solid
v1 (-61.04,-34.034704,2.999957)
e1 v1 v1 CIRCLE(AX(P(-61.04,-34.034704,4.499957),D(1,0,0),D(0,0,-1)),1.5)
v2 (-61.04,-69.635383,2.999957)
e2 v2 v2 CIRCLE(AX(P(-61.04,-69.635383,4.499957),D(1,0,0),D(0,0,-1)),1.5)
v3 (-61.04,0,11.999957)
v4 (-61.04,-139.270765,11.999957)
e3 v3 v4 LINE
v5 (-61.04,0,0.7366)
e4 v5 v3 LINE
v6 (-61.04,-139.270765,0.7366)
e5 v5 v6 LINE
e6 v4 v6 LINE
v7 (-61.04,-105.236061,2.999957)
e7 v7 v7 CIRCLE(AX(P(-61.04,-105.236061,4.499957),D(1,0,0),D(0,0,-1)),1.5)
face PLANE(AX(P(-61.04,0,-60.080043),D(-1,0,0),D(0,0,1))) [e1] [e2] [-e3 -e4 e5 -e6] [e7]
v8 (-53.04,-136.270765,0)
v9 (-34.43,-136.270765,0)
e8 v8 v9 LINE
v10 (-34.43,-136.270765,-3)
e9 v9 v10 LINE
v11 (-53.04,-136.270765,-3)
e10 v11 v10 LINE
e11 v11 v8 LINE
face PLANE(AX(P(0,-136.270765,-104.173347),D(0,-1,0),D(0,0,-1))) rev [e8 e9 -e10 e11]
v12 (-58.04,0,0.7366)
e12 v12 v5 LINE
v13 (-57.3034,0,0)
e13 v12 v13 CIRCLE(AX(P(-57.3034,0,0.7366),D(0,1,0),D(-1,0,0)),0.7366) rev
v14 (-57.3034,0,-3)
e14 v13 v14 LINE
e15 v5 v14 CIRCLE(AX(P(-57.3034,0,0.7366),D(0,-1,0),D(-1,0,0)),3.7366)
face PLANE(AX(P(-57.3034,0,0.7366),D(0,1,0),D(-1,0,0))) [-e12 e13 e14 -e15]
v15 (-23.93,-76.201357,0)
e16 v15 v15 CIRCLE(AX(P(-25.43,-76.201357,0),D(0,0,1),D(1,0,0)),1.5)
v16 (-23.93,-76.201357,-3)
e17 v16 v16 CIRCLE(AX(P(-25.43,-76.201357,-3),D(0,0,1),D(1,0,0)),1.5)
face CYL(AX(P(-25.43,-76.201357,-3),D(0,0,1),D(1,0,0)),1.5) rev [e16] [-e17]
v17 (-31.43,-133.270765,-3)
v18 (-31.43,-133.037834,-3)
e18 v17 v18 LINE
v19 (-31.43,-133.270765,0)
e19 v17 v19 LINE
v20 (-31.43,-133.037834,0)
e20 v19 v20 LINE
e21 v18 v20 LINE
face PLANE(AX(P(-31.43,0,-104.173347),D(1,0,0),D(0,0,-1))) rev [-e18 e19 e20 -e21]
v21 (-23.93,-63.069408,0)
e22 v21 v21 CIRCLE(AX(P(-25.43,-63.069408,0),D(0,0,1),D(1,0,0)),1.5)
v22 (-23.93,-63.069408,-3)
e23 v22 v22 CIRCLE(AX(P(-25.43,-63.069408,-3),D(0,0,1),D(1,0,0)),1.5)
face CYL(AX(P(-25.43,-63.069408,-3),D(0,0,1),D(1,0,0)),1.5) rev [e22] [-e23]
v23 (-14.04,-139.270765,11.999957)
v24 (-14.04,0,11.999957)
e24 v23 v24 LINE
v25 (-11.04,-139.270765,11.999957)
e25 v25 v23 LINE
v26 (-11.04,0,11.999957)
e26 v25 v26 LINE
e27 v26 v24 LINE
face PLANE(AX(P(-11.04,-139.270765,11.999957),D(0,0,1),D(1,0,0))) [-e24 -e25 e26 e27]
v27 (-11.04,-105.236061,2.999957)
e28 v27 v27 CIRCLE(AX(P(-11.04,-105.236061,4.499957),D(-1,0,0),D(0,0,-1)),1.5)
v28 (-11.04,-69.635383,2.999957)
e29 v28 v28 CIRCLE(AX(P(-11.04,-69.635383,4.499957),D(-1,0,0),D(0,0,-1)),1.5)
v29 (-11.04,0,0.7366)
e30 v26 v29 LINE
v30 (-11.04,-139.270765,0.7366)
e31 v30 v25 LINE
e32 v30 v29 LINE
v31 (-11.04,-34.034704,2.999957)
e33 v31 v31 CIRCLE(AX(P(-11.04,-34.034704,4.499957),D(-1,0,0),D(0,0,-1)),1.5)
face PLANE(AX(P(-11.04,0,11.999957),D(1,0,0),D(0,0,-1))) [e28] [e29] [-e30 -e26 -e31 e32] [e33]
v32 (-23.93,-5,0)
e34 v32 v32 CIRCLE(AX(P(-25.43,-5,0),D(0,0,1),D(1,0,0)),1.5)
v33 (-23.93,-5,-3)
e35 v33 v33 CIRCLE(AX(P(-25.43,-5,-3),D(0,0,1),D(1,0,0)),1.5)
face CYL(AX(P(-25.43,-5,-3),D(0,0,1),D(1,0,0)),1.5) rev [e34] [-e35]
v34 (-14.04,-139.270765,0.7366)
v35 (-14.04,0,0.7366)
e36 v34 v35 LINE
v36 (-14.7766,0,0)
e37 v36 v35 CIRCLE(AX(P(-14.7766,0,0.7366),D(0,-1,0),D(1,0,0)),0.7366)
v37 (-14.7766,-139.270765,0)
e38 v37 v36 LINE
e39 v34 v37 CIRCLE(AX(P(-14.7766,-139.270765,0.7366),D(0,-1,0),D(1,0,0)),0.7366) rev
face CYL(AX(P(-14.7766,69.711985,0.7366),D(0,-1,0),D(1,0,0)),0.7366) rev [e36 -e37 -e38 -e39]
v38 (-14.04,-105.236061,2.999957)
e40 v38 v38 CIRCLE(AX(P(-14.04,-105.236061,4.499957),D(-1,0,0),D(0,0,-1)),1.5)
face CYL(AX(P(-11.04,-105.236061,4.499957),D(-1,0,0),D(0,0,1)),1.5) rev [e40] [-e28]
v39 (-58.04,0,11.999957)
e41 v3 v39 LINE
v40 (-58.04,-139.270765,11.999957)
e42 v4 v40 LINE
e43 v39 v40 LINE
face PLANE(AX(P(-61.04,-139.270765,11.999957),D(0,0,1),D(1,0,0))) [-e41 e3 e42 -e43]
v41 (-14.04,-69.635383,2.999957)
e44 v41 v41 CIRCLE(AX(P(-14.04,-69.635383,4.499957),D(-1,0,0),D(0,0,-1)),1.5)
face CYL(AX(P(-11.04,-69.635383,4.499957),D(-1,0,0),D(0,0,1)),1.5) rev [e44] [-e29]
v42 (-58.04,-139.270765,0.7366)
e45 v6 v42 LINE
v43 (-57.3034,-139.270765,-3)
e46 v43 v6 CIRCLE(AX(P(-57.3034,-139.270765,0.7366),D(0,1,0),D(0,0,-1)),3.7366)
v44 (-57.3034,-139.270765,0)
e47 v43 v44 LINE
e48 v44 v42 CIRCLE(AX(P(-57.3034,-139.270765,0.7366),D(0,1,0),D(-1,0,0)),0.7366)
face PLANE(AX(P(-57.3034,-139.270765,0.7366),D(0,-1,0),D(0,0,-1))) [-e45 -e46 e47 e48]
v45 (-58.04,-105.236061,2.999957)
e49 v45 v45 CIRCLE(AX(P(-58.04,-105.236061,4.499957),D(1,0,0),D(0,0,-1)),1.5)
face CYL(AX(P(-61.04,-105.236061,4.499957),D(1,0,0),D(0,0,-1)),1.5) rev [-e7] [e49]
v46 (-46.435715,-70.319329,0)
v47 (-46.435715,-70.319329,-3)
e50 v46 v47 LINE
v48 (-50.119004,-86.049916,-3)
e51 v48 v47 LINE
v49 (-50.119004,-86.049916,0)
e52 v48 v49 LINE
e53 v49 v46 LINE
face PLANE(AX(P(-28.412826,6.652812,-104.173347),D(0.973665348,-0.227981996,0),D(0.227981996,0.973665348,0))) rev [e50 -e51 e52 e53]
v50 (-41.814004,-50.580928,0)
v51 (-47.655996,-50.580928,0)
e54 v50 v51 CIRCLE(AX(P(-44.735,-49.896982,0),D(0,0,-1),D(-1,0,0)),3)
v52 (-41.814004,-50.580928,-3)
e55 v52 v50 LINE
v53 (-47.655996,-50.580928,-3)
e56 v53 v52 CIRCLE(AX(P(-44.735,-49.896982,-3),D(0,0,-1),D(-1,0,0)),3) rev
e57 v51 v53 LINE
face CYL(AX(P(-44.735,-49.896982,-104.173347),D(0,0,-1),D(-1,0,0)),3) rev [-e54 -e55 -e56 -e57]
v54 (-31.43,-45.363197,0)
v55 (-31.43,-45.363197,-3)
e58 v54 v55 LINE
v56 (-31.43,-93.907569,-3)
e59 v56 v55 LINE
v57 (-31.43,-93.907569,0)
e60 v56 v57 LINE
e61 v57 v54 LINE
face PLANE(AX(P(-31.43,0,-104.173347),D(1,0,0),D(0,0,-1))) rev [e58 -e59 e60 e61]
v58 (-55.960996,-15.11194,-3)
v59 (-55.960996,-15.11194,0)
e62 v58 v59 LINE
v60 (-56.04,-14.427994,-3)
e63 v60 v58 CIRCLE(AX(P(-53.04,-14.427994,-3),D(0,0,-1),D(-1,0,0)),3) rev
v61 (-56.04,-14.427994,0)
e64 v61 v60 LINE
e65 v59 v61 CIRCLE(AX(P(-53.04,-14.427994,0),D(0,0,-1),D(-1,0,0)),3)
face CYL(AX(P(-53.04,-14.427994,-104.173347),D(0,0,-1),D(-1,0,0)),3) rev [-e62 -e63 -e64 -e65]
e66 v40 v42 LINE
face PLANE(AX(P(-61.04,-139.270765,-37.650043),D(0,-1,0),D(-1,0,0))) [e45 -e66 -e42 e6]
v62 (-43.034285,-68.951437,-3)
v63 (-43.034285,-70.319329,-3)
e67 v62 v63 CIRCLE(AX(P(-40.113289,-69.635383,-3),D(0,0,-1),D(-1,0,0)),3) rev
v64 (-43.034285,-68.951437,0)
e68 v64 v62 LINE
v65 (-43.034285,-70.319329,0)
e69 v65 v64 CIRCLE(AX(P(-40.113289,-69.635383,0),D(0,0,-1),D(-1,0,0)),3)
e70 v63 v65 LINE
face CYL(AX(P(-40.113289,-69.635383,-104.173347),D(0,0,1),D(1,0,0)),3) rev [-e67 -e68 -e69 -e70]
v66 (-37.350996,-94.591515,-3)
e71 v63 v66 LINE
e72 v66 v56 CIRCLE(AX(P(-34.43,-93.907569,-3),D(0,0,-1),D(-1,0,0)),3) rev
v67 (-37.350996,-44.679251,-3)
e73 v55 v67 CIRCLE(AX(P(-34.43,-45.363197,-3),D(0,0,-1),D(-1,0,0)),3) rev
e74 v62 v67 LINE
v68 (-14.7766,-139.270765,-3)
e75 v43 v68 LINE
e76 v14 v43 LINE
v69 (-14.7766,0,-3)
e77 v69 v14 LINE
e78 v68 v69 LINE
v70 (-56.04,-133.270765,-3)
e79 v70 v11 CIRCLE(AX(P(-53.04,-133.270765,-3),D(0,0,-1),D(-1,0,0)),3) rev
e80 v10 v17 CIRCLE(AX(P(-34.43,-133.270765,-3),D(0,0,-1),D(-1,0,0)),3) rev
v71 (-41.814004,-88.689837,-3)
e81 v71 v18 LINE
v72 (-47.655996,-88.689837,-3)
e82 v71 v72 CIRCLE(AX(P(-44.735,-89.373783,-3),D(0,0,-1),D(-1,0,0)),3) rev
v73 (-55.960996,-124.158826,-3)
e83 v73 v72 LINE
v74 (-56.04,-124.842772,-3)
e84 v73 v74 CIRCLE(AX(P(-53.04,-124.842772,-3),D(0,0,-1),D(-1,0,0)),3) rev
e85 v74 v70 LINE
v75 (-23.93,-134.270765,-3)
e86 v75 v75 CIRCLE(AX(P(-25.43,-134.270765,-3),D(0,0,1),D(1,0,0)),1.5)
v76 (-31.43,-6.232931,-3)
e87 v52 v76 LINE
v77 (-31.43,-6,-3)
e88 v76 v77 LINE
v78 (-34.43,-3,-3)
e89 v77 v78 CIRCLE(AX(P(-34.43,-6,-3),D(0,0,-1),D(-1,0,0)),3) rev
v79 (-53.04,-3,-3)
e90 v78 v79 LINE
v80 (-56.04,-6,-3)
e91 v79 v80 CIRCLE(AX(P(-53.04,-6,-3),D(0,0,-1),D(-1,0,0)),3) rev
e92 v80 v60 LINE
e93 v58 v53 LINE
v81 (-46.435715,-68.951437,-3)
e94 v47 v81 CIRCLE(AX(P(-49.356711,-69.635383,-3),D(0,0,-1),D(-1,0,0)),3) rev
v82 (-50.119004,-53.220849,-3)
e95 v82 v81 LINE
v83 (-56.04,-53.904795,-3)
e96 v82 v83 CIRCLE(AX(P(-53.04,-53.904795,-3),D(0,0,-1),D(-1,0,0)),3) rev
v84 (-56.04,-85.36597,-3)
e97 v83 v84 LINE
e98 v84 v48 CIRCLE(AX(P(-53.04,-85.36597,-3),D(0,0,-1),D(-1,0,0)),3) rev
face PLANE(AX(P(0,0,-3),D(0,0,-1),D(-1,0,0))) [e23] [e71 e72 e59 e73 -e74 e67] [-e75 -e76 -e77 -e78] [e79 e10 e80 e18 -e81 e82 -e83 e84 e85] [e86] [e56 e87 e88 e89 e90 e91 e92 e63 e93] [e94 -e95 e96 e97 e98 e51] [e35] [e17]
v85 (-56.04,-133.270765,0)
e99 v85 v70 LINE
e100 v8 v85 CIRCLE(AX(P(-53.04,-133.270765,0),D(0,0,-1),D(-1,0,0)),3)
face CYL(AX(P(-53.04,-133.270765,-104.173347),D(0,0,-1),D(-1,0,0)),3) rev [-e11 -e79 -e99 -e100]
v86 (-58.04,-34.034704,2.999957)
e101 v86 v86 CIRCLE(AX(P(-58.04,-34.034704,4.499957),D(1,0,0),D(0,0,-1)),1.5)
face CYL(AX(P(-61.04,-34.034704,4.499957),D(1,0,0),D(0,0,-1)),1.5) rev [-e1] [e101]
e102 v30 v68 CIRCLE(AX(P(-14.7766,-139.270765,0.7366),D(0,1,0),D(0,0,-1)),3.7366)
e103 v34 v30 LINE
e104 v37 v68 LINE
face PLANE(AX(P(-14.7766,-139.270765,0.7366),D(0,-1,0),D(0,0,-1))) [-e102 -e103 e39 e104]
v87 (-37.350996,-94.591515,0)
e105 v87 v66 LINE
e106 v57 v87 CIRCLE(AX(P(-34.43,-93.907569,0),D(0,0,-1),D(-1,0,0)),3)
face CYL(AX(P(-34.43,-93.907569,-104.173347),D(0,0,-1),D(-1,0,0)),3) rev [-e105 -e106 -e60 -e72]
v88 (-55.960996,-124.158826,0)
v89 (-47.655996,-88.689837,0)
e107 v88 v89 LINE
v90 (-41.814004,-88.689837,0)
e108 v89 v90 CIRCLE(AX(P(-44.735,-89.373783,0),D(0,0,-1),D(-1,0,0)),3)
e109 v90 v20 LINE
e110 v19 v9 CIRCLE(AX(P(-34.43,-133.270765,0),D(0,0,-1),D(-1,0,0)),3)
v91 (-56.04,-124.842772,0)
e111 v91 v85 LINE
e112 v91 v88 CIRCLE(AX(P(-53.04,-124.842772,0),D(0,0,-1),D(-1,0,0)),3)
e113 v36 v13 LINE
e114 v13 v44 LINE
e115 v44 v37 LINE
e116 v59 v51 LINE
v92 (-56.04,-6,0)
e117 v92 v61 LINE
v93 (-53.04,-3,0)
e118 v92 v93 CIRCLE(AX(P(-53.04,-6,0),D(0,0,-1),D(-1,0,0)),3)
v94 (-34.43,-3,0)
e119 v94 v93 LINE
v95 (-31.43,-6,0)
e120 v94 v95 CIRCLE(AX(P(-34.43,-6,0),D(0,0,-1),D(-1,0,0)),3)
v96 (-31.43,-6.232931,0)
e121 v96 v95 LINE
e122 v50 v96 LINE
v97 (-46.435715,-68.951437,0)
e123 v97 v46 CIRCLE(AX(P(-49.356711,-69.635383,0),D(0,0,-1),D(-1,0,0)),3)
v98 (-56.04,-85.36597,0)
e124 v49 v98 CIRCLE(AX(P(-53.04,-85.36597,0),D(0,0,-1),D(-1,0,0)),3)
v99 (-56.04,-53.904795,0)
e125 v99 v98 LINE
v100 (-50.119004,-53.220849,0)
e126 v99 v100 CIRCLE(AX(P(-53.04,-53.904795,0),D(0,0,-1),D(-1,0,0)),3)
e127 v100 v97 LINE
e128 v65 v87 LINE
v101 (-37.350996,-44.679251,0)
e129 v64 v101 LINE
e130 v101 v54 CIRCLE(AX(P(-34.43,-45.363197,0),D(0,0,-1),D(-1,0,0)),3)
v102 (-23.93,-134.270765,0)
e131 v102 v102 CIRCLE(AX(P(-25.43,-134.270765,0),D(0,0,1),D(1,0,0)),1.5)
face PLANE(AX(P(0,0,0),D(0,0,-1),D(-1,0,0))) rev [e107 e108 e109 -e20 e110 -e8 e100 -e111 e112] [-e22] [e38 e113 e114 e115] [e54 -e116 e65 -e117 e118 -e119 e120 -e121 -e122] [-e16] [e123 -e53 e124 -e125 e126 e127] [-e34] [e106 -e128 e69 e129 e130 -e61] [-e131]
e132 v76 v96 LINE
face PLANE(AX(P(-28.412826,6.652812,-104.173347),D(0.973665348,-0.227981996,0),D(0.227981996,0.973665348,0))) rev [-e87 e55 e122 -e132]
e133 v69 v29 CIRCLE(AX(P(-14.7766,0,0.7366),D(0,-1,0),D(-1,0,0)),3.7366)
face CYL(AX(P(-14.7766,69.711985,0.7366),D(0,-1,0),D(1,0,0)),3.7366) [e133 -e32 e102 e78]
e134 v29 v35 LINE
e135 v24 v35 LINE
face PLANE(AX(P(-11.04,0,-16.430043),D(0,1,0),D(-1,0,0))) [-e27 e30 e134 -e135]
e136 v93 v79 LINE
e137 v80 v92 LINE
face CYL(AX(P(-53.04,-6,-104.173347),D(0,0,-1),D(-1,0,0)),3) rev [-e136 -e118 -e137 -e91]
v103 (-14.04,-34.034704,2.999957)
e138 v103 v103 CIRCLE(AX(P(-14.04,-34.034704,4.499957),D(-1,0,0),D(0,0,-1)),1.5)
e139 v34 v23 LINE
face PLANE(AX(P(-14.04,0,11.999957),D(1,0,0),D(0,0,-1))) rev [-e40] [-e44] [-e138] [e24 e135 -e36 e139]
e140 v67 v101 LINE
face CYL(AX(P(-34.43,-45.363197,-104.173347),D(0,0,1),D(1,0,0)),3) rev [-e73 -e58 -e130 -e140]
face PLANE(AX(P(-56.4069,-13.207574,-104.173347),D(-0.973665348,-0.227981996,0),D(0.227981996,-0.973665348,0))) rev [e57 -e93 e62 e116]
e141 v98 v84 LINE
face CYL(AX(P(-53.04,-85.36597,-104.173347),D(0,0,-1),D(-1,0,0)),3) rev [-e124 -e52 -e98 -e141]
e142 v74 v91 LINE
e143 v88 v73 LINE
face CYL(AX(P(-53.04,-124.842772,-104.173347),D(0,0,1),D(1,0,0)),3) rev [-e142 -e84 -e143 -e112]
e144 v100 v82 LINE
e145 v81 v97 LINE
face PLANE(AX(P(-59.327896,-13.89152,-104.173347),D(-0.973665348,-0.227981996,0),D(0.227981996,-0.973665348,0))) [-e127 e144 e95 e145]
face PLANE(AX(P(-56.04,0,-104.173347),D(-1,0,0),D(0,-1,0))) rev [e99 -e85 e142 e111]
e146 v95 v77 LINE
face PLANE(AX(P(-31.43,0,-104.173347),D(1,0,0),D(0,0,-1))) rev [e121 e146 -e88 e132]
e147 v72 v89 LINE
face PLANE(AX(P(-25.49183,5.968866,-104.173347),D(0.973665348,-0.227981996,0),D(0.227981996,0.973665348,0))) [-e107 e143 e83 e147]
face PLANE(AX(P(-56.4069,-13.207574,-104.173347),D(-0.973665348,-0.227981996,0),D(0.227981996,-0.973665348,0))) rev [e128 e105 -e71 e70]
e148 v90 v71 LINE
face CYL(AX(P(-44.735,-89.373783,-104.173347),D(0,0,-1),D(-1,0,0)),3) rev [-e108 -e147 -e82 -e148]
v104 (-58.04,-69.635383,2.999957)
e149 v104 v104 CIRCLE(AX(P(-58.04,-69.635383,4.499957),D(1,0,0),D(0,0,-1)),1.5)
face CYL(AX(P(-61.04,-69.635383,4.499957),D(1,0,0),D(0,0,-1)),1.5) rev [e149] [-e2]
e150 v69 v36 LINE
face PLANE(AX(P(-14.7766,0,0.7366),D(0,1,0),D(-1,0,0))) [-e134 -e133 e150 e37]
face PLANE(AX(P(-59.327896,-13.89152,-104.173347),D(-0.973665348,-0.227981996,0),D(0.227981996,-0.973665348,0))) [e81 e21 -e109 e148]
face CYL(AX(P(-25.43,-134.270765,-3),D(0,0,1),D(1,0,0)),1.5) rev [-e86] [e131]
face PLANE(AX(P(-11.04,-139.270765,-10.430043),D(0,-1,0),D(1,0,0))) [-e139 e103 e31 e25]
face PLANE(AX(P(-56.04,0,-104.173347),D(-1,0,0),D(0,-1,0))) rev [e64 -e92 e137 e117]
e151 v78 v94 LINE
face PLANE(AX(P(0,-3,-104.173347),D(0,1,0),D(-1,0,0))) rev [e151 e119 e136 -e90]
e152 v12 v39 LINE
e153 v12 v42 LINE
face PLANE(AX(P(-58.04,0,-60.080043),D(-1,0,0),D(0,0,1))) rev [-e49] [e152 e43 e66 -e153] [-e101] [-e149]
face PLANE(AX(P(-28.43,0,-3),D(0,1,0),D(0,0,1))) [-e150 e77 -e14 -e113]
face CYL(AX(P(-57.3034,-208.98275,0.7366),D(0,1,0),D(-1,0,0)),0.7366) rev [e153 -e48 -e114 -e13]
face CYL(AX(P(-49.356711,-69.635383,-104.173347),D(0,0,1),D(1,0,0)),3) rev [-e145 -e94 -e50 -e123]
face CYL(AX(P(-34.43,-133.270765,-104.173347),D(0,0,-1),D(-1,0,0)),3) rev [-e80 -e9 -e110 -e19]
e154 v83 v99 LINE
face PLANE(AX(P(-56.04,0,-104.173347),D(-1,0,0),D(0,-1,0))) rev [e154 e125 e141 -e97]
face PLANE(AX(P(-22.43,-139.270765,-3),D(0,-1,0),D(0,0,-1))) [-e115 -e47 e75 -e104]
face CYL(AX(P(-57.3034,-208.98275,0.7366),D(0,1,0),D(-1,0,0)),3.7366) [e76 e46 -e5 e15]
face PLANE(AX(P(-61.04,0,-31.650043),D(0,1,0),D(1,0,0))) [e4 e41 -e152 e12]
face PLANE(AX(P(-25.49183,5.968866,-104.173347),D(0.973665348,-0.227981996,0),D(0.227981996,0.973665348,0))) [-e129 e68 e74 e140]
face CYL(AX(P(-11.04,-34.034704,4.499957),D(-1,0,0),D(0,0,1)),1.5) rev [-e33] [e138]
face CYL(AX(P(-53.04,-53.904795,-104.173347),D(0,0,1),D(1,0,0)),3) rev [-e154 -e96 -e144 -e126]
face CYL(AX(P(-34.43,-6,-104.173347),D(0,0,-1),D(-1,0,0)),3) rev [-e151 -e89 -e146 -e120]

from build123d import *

# Parameters (mm, degrees)
SKETCH1_R                  = 1.5
BASE_FLANGE2_DEPTH         = 3
CUT_EXTRUDE1_DEPTH         = 3
FILLET2_R                  = 3
SKETCHED_START             = -72.08
SKETCHED_BEND2_OUTLINE_W   = 139.27076518
SKETCHED_BEND2_OUTLINE_H   = 3
SKETCHED_BEND2_DEPTH       = 11.04
SKETCHED_START_2           = -11.04
SKETCHED_BEND2_2_OUTLINE_W = 139.27076518
SKETCHED_BEND2_2_OUTLINE_H = 3
SKETCHED_BEND2_2_DEPTH     = 11.04
SKETCHED_START_3           = -60.687339692
SKETCHED_BEND2_3_OUTLINE_W = 139.27076518
SKETCHED_BEND2_3_OUTLINE_H = 11.999956935
SKETCHED_BEND2_3_OUTLINE_R = 1.5
SKETCHED_BEND2_3_DEPTH     = 2.647339692
SKETCHED_START_4           = -14.04
SKETCHED_BEND2_4_OUTLINE_W = 139.27076518
SKETCHED_BEND2_4_OUTLINE_H = 11.999956935
SKETCHED_BEND2_4_OUTLINE_R = 1.5
SKETCHED_BEND2_4_DEPTH     = 2.616101716
SKETCHED_START_5           = -14.7766
SKETCHED_BEND2_5_OUTLINE_W = 139.27076518
SKETCHED_BEND2_5_OUTLINE_H = 11.999956935
SKETCHED_BEND2_5_OUTLINE_R = 1.5
SKETCHED_BEND2_5_DEPTH     = 3.7366
SKETCHED_START_6           = -61.04
SKETCHED_BEND2_6_OUTLINE_W = 139.27076518
SKETCHED_BEND2_6_OUTLINE_H = 11.999956935
SKETCHED_BEND2_6_OUTLINE_R = 1.5
SKETCHED_BEND2_6_DEPTH     = 3.7366
SKETCHED_START_7           = -140
SKETCHED_BEND2_7_DEPTH     = 141


with BuildPart() as part:
    # Base-Flange2: sheet metal written as solids
    # Sketch1 → Base-Flange2 (new body)
    with BuildSketch(Plane.XY):
        Polygon((-72.08, -139.27076518), (-28.43, -139.27076518), (-22.43, -139.27076518), (0, -139.27076518), (0, 0), (-22.43, 0), (-28.43, 0), (-72.08, 0), align=None)
        with Locations((-25.43, -134.27076518)):
            Circle(SKETCH1_R, mode=Mode.SUBTRACT)
        with Locations((-25.43, -76.20135678)):
            Circle(SKETCH1_R, mode=Mode.SUBTRACT)
        with Locations((-25.43, -63.0694084)):
            Circle(SKETCH1_R, mode=Mode.SUBTRACT)
        with Locations((-25.43, -5)):
            Circle(SKETCH1_R, mode=Mode.SUBTRACT)
        with Locations((-64.58, -69.63538259)):
            Circle(SKETCH1_R, mode=Mode.SUBTRACT)
        with Locations((-64.58, -105.23606098)):
            Circle(SKETCH1_R, mode=Mode.SUBTRACT)
        with Locations((-64.58, -34.0347042)):
            Circle(SKETCH1_R, mode=Mode.SUBTRACT)
        with Locations(Location((-7.5, -105.23606098, 0), (0, 0, 180))):
            Circle(SKETCH1_R, mode=Mode.SUBTRACT)
        with Locations(Location((-7.5, -69.63538259, 0), (0, 0, 180))):
            Circle(SKETCH1_R, mode=Mode.SUBTRACT)
        with Locations(Location((-7.5, -34.0347042, 0), (0, 0, 180))):
            Circle(SKETCH1_R, mode=Mode.SUBTRACT)
    extrude(amount=-BASE_FLANGE2_DEPTH)

    # Sketch16 → Cut-Extrude1 (cut)
    with BuildSketch(Plane.XY):
        Polygon((-56.04, -3), (-56.04, -14.774529578), (-44.735, -63.055915667), (-31.43, -6.232930978), (-31.43, -3), align=None)
        Polygon((-31.43, -19.391864824), (-43.194429615, -69.63538259), (-31.43, -119.878900356), align=None)
        Polygon((-46.275570385, -69.63538259), (-56.04, -27.933463424), (-56.04, -111.337301756), align=None)
        Polygon((-44.735, -76.214849513), (-56.04, -124.496235602), (-56.04, -136.27076518), (-31.43, -136.27076518), (-31.43, -133.037834202), align=None)
    extrude(amount=-CUT_EXTRUDE1_DEPTH, mode=Mode.SUBTRACT)

    # Fillet2
    fillet2_edges = [part.edges().sort_by_distance(p)[0] for p in [
        (-31.43, -136.27076518, -1.5),
        (-44.735, -76.214849513, -1.5),
        (-56.04, -124.496235602, -1.5),
        (-56.04, -136.27076518, -1.5),
        (-56.04, -3, -1.5),
        (-56.04, -14.774529578, -1.5),
        (-44.735, -63.055915667, -1.5),
        (-31.43, -3, -1.5),
        (-31.43, -19.391864824, -1.5),
        (-43.194429615, -69.63538259, -1.5),
        (-31.43, -119.878900356, -1.5),
        (-56.04, -111.337301756, -1.5),
        (-46.275570385, -69.63538259, -1.5),
        (-56.04, -27.933463424, -1.5),
    ]]
    fillet(fillet2_edges, radius=FILLET2_R)

    # Sketched Bend2: read off the stored shape, not the designer's step
    # Sketched Bend2 outline → Sketched Bend2 (cut)
    with BuildSketch(Plane.YZ.offset(SKETCHED_START)):
        with Locations((-69.63538259, -1.5)):
            Rectangle(SKETCHED_BEND2_OUTLINE_W, SKETCHED_BEND2_OUTLINE_H)
    extrude(amount=SKETCHED_BEND2_DEPTH, mode=Mode.SUBTRACT)

    # Sketched Bend2 2 outline → Sketched Bend2 2 (cut)
    with BuildSketch(Plane.YZ.offset(SKETCHED_START_2)):
        with Locations((-69.63538259, -1.5)):
            Rectangle(SKETCHED_BEND2_2_OUTLINE_W, SKETCHED_BEND2_2_OUTLINE_H)
    extrude(amount=SKETCHED_BEND2_2_DEPTH, mode=Mode.SUBTRACT)

    # Sketched Bend2 3 outline → Sketched Bend2 3 (add)
    with BuildSketch(Plane.YZ.offset(SKETCHED_START_3)):
        with Locations((-69.63538259, 5.999978468)):
            Rectangle(SKETCHED_BEND2_3_OUTLINE_W, SKETCHED_BEND2_3_OUTLINE_H)
        with Locations((-105.23606098, 4.499956935)):
            Circle(SKETCHED_BEND2_3_OUTLINE_R, mode=Mode.SUBTRACT)
        with Locations((-69.63538259, 4.499956935)):
            Circle(SKETCHED_BEND2_3_OUTLINE_R, mode=Mode.SUBTRACT)
        with Locations((-34.0347042, 4.499956935)):
            Circle(SKETCHED_BEND2_3_OUTLINE_R, mode=Mode.SUBTRACT)
    extrude(amount=SKETCHED_BEND2_3_DEPTH)

    # Sketched Bend2 4 outline → Sketched Bend2 4 (add)
    with BuildSketch(Plane.YZ.offset(SKETCHED_START_4)):
        with Locations((-69.63538259, 5.999978468)):
            Rectangle(SKETCHED_BEND2_4_OUTLINE_W, SKETCHED_BEND2_4_OUTLINE_H)
        with Locations((-105.23606098, 4.499956935)):
            Circle(SKETCHED_BEND2_4_OUTLINE_R, mode=Mode.SUBTRACT)
        with Locations((-69.63538259, 4.499956935)):
            Circle(SKETCHED_BEND2_4_OUTLINE_R, mode=Mode.SUBTRACT)
        with Locations((-34.0347042, 4.499956935)):
            Circle(SKETCHED_BEND2_4_OUTLINE_R, mode=Mode.SUBTRACT)
    extrude(amount=SKETCHED_BEND2_4_DEPTH)

    # Sketched Bend2 5 outline → Sketched Bend2 5 (add)
    with BuildSketch(Plane.YZ.offset(SKETCHED_START_5)):
        with Locations((-69.63538259, 5.999978468)):
            Rectangle(SKETCHED_BEND2_5_OUTLINE_W, SKETCHED_BEND2_5_OUTLINE_H)
        with Locations((-105.23606098, 4.499956935)):
            Circle(SKETCHED_BEND2_5_OUTLINE_R, mode=Mode.SUBTRACT)
        with Locations((-69.63538259, 4.499956935)):
            Circle(SKETCHED_BEND2_5_OUTLINE_R, mode=Mode.SUBTRACT)
        with Locations((-34.0347042, 4.499956935)):
            Circle(SKETCHED_BEND2_5_OUTLINE_R, mode=Mode.SUBTRACT)
    extrude(amount=SKETCHED_BEND2_5_DEPTH)

    # Sketched Bend2 6 outline → Sketched Bend2 6 (add)
    with BuildSketch(Plane.YZ.offset(SKETCHED_START_6)):
        with Locations((-69.63538259, 5.999978468)):
            Rectangle(SKETCHED_BEND2_6_OUTLINE_W, SKETCHED_BEND2_6_OUTLINE_H)
        with Locations((-105.23606098, 4.499956935)):
            Circle(SKETCHED_BEND2_6_OUTLINE_R, mode=Mode.SUBTRACT)
        with Locations((-69.63538259, 4.499956935)):
            Circle(SKETCHED_BEND2_6_OUTLINE_R, mode=Mode.SUBTRACT)
        with Locations((-34.0347042, 4.499956935)):
            Circle(SKETCHED_BEND2_6_OUTLINE_R, mode=Mode.SUBTRACT)
    extrude(amount=SKETCHED_BEND2_6_DEPTH)

    # Sketched Bend2 7 outline → Sketched Bend2 7 (cut)
    with BuildSketch(Plane(origin=(0, 0, 0), x_dir=(1, 0, 0), z_dir=(0, 1, 0)).offset(SKETCHED_START_7)):
        with BuildLine():
            Line((-58.04, -0.7366), (-58.04, -11.999956935))
            Line((-58.04, -11.999956935), (-57.3034, -11.999956935))
            Line((-57.3034, -11.999956935), (-57.3034, 0))
            ThreePointArc((-57.3034, 0), (-57.824254855, -0.215745145), (-58.04, -0.7366))
        make_face()
        with BuildLine():
            Line((-14.7766, -11.999956935), (-14.04, -11.999956935))
            Line((-14.04, -11.999956935), (-14.04, -0.7366))
            ThreePointArc((-14.04, -0.7366), (-14.255745145, -0.215745145), (-14.7766, 0))
            Line((-14.7766, 0), (-14.7766, -11.999956935))
        make_face()
        with BuildLine():
            Line((-11.04, 3), (-14.7766, 3))
            ThreePointArc((-14.7766, 3), (-12.134424801, 1.905575199), (-11.04, -0.7366))
            Line((-11.04, -0.7366), (-11.04, 3))
        make_face()
        with BuildLine():
            ThreePointArc((-61.04, -0.7366), (-59.945575199, 1.905575199), (-57.3034, 3))
            Line((-57.3034, 3), (-61.04, 3))
            Line((-61.04, 3), (-61.04, -0.7366))
        make_face()
    extrude(amount=SKETCHED_BEND2_7_DEPTH, mode=Mode.SUBTRACT)


solid = part.part
